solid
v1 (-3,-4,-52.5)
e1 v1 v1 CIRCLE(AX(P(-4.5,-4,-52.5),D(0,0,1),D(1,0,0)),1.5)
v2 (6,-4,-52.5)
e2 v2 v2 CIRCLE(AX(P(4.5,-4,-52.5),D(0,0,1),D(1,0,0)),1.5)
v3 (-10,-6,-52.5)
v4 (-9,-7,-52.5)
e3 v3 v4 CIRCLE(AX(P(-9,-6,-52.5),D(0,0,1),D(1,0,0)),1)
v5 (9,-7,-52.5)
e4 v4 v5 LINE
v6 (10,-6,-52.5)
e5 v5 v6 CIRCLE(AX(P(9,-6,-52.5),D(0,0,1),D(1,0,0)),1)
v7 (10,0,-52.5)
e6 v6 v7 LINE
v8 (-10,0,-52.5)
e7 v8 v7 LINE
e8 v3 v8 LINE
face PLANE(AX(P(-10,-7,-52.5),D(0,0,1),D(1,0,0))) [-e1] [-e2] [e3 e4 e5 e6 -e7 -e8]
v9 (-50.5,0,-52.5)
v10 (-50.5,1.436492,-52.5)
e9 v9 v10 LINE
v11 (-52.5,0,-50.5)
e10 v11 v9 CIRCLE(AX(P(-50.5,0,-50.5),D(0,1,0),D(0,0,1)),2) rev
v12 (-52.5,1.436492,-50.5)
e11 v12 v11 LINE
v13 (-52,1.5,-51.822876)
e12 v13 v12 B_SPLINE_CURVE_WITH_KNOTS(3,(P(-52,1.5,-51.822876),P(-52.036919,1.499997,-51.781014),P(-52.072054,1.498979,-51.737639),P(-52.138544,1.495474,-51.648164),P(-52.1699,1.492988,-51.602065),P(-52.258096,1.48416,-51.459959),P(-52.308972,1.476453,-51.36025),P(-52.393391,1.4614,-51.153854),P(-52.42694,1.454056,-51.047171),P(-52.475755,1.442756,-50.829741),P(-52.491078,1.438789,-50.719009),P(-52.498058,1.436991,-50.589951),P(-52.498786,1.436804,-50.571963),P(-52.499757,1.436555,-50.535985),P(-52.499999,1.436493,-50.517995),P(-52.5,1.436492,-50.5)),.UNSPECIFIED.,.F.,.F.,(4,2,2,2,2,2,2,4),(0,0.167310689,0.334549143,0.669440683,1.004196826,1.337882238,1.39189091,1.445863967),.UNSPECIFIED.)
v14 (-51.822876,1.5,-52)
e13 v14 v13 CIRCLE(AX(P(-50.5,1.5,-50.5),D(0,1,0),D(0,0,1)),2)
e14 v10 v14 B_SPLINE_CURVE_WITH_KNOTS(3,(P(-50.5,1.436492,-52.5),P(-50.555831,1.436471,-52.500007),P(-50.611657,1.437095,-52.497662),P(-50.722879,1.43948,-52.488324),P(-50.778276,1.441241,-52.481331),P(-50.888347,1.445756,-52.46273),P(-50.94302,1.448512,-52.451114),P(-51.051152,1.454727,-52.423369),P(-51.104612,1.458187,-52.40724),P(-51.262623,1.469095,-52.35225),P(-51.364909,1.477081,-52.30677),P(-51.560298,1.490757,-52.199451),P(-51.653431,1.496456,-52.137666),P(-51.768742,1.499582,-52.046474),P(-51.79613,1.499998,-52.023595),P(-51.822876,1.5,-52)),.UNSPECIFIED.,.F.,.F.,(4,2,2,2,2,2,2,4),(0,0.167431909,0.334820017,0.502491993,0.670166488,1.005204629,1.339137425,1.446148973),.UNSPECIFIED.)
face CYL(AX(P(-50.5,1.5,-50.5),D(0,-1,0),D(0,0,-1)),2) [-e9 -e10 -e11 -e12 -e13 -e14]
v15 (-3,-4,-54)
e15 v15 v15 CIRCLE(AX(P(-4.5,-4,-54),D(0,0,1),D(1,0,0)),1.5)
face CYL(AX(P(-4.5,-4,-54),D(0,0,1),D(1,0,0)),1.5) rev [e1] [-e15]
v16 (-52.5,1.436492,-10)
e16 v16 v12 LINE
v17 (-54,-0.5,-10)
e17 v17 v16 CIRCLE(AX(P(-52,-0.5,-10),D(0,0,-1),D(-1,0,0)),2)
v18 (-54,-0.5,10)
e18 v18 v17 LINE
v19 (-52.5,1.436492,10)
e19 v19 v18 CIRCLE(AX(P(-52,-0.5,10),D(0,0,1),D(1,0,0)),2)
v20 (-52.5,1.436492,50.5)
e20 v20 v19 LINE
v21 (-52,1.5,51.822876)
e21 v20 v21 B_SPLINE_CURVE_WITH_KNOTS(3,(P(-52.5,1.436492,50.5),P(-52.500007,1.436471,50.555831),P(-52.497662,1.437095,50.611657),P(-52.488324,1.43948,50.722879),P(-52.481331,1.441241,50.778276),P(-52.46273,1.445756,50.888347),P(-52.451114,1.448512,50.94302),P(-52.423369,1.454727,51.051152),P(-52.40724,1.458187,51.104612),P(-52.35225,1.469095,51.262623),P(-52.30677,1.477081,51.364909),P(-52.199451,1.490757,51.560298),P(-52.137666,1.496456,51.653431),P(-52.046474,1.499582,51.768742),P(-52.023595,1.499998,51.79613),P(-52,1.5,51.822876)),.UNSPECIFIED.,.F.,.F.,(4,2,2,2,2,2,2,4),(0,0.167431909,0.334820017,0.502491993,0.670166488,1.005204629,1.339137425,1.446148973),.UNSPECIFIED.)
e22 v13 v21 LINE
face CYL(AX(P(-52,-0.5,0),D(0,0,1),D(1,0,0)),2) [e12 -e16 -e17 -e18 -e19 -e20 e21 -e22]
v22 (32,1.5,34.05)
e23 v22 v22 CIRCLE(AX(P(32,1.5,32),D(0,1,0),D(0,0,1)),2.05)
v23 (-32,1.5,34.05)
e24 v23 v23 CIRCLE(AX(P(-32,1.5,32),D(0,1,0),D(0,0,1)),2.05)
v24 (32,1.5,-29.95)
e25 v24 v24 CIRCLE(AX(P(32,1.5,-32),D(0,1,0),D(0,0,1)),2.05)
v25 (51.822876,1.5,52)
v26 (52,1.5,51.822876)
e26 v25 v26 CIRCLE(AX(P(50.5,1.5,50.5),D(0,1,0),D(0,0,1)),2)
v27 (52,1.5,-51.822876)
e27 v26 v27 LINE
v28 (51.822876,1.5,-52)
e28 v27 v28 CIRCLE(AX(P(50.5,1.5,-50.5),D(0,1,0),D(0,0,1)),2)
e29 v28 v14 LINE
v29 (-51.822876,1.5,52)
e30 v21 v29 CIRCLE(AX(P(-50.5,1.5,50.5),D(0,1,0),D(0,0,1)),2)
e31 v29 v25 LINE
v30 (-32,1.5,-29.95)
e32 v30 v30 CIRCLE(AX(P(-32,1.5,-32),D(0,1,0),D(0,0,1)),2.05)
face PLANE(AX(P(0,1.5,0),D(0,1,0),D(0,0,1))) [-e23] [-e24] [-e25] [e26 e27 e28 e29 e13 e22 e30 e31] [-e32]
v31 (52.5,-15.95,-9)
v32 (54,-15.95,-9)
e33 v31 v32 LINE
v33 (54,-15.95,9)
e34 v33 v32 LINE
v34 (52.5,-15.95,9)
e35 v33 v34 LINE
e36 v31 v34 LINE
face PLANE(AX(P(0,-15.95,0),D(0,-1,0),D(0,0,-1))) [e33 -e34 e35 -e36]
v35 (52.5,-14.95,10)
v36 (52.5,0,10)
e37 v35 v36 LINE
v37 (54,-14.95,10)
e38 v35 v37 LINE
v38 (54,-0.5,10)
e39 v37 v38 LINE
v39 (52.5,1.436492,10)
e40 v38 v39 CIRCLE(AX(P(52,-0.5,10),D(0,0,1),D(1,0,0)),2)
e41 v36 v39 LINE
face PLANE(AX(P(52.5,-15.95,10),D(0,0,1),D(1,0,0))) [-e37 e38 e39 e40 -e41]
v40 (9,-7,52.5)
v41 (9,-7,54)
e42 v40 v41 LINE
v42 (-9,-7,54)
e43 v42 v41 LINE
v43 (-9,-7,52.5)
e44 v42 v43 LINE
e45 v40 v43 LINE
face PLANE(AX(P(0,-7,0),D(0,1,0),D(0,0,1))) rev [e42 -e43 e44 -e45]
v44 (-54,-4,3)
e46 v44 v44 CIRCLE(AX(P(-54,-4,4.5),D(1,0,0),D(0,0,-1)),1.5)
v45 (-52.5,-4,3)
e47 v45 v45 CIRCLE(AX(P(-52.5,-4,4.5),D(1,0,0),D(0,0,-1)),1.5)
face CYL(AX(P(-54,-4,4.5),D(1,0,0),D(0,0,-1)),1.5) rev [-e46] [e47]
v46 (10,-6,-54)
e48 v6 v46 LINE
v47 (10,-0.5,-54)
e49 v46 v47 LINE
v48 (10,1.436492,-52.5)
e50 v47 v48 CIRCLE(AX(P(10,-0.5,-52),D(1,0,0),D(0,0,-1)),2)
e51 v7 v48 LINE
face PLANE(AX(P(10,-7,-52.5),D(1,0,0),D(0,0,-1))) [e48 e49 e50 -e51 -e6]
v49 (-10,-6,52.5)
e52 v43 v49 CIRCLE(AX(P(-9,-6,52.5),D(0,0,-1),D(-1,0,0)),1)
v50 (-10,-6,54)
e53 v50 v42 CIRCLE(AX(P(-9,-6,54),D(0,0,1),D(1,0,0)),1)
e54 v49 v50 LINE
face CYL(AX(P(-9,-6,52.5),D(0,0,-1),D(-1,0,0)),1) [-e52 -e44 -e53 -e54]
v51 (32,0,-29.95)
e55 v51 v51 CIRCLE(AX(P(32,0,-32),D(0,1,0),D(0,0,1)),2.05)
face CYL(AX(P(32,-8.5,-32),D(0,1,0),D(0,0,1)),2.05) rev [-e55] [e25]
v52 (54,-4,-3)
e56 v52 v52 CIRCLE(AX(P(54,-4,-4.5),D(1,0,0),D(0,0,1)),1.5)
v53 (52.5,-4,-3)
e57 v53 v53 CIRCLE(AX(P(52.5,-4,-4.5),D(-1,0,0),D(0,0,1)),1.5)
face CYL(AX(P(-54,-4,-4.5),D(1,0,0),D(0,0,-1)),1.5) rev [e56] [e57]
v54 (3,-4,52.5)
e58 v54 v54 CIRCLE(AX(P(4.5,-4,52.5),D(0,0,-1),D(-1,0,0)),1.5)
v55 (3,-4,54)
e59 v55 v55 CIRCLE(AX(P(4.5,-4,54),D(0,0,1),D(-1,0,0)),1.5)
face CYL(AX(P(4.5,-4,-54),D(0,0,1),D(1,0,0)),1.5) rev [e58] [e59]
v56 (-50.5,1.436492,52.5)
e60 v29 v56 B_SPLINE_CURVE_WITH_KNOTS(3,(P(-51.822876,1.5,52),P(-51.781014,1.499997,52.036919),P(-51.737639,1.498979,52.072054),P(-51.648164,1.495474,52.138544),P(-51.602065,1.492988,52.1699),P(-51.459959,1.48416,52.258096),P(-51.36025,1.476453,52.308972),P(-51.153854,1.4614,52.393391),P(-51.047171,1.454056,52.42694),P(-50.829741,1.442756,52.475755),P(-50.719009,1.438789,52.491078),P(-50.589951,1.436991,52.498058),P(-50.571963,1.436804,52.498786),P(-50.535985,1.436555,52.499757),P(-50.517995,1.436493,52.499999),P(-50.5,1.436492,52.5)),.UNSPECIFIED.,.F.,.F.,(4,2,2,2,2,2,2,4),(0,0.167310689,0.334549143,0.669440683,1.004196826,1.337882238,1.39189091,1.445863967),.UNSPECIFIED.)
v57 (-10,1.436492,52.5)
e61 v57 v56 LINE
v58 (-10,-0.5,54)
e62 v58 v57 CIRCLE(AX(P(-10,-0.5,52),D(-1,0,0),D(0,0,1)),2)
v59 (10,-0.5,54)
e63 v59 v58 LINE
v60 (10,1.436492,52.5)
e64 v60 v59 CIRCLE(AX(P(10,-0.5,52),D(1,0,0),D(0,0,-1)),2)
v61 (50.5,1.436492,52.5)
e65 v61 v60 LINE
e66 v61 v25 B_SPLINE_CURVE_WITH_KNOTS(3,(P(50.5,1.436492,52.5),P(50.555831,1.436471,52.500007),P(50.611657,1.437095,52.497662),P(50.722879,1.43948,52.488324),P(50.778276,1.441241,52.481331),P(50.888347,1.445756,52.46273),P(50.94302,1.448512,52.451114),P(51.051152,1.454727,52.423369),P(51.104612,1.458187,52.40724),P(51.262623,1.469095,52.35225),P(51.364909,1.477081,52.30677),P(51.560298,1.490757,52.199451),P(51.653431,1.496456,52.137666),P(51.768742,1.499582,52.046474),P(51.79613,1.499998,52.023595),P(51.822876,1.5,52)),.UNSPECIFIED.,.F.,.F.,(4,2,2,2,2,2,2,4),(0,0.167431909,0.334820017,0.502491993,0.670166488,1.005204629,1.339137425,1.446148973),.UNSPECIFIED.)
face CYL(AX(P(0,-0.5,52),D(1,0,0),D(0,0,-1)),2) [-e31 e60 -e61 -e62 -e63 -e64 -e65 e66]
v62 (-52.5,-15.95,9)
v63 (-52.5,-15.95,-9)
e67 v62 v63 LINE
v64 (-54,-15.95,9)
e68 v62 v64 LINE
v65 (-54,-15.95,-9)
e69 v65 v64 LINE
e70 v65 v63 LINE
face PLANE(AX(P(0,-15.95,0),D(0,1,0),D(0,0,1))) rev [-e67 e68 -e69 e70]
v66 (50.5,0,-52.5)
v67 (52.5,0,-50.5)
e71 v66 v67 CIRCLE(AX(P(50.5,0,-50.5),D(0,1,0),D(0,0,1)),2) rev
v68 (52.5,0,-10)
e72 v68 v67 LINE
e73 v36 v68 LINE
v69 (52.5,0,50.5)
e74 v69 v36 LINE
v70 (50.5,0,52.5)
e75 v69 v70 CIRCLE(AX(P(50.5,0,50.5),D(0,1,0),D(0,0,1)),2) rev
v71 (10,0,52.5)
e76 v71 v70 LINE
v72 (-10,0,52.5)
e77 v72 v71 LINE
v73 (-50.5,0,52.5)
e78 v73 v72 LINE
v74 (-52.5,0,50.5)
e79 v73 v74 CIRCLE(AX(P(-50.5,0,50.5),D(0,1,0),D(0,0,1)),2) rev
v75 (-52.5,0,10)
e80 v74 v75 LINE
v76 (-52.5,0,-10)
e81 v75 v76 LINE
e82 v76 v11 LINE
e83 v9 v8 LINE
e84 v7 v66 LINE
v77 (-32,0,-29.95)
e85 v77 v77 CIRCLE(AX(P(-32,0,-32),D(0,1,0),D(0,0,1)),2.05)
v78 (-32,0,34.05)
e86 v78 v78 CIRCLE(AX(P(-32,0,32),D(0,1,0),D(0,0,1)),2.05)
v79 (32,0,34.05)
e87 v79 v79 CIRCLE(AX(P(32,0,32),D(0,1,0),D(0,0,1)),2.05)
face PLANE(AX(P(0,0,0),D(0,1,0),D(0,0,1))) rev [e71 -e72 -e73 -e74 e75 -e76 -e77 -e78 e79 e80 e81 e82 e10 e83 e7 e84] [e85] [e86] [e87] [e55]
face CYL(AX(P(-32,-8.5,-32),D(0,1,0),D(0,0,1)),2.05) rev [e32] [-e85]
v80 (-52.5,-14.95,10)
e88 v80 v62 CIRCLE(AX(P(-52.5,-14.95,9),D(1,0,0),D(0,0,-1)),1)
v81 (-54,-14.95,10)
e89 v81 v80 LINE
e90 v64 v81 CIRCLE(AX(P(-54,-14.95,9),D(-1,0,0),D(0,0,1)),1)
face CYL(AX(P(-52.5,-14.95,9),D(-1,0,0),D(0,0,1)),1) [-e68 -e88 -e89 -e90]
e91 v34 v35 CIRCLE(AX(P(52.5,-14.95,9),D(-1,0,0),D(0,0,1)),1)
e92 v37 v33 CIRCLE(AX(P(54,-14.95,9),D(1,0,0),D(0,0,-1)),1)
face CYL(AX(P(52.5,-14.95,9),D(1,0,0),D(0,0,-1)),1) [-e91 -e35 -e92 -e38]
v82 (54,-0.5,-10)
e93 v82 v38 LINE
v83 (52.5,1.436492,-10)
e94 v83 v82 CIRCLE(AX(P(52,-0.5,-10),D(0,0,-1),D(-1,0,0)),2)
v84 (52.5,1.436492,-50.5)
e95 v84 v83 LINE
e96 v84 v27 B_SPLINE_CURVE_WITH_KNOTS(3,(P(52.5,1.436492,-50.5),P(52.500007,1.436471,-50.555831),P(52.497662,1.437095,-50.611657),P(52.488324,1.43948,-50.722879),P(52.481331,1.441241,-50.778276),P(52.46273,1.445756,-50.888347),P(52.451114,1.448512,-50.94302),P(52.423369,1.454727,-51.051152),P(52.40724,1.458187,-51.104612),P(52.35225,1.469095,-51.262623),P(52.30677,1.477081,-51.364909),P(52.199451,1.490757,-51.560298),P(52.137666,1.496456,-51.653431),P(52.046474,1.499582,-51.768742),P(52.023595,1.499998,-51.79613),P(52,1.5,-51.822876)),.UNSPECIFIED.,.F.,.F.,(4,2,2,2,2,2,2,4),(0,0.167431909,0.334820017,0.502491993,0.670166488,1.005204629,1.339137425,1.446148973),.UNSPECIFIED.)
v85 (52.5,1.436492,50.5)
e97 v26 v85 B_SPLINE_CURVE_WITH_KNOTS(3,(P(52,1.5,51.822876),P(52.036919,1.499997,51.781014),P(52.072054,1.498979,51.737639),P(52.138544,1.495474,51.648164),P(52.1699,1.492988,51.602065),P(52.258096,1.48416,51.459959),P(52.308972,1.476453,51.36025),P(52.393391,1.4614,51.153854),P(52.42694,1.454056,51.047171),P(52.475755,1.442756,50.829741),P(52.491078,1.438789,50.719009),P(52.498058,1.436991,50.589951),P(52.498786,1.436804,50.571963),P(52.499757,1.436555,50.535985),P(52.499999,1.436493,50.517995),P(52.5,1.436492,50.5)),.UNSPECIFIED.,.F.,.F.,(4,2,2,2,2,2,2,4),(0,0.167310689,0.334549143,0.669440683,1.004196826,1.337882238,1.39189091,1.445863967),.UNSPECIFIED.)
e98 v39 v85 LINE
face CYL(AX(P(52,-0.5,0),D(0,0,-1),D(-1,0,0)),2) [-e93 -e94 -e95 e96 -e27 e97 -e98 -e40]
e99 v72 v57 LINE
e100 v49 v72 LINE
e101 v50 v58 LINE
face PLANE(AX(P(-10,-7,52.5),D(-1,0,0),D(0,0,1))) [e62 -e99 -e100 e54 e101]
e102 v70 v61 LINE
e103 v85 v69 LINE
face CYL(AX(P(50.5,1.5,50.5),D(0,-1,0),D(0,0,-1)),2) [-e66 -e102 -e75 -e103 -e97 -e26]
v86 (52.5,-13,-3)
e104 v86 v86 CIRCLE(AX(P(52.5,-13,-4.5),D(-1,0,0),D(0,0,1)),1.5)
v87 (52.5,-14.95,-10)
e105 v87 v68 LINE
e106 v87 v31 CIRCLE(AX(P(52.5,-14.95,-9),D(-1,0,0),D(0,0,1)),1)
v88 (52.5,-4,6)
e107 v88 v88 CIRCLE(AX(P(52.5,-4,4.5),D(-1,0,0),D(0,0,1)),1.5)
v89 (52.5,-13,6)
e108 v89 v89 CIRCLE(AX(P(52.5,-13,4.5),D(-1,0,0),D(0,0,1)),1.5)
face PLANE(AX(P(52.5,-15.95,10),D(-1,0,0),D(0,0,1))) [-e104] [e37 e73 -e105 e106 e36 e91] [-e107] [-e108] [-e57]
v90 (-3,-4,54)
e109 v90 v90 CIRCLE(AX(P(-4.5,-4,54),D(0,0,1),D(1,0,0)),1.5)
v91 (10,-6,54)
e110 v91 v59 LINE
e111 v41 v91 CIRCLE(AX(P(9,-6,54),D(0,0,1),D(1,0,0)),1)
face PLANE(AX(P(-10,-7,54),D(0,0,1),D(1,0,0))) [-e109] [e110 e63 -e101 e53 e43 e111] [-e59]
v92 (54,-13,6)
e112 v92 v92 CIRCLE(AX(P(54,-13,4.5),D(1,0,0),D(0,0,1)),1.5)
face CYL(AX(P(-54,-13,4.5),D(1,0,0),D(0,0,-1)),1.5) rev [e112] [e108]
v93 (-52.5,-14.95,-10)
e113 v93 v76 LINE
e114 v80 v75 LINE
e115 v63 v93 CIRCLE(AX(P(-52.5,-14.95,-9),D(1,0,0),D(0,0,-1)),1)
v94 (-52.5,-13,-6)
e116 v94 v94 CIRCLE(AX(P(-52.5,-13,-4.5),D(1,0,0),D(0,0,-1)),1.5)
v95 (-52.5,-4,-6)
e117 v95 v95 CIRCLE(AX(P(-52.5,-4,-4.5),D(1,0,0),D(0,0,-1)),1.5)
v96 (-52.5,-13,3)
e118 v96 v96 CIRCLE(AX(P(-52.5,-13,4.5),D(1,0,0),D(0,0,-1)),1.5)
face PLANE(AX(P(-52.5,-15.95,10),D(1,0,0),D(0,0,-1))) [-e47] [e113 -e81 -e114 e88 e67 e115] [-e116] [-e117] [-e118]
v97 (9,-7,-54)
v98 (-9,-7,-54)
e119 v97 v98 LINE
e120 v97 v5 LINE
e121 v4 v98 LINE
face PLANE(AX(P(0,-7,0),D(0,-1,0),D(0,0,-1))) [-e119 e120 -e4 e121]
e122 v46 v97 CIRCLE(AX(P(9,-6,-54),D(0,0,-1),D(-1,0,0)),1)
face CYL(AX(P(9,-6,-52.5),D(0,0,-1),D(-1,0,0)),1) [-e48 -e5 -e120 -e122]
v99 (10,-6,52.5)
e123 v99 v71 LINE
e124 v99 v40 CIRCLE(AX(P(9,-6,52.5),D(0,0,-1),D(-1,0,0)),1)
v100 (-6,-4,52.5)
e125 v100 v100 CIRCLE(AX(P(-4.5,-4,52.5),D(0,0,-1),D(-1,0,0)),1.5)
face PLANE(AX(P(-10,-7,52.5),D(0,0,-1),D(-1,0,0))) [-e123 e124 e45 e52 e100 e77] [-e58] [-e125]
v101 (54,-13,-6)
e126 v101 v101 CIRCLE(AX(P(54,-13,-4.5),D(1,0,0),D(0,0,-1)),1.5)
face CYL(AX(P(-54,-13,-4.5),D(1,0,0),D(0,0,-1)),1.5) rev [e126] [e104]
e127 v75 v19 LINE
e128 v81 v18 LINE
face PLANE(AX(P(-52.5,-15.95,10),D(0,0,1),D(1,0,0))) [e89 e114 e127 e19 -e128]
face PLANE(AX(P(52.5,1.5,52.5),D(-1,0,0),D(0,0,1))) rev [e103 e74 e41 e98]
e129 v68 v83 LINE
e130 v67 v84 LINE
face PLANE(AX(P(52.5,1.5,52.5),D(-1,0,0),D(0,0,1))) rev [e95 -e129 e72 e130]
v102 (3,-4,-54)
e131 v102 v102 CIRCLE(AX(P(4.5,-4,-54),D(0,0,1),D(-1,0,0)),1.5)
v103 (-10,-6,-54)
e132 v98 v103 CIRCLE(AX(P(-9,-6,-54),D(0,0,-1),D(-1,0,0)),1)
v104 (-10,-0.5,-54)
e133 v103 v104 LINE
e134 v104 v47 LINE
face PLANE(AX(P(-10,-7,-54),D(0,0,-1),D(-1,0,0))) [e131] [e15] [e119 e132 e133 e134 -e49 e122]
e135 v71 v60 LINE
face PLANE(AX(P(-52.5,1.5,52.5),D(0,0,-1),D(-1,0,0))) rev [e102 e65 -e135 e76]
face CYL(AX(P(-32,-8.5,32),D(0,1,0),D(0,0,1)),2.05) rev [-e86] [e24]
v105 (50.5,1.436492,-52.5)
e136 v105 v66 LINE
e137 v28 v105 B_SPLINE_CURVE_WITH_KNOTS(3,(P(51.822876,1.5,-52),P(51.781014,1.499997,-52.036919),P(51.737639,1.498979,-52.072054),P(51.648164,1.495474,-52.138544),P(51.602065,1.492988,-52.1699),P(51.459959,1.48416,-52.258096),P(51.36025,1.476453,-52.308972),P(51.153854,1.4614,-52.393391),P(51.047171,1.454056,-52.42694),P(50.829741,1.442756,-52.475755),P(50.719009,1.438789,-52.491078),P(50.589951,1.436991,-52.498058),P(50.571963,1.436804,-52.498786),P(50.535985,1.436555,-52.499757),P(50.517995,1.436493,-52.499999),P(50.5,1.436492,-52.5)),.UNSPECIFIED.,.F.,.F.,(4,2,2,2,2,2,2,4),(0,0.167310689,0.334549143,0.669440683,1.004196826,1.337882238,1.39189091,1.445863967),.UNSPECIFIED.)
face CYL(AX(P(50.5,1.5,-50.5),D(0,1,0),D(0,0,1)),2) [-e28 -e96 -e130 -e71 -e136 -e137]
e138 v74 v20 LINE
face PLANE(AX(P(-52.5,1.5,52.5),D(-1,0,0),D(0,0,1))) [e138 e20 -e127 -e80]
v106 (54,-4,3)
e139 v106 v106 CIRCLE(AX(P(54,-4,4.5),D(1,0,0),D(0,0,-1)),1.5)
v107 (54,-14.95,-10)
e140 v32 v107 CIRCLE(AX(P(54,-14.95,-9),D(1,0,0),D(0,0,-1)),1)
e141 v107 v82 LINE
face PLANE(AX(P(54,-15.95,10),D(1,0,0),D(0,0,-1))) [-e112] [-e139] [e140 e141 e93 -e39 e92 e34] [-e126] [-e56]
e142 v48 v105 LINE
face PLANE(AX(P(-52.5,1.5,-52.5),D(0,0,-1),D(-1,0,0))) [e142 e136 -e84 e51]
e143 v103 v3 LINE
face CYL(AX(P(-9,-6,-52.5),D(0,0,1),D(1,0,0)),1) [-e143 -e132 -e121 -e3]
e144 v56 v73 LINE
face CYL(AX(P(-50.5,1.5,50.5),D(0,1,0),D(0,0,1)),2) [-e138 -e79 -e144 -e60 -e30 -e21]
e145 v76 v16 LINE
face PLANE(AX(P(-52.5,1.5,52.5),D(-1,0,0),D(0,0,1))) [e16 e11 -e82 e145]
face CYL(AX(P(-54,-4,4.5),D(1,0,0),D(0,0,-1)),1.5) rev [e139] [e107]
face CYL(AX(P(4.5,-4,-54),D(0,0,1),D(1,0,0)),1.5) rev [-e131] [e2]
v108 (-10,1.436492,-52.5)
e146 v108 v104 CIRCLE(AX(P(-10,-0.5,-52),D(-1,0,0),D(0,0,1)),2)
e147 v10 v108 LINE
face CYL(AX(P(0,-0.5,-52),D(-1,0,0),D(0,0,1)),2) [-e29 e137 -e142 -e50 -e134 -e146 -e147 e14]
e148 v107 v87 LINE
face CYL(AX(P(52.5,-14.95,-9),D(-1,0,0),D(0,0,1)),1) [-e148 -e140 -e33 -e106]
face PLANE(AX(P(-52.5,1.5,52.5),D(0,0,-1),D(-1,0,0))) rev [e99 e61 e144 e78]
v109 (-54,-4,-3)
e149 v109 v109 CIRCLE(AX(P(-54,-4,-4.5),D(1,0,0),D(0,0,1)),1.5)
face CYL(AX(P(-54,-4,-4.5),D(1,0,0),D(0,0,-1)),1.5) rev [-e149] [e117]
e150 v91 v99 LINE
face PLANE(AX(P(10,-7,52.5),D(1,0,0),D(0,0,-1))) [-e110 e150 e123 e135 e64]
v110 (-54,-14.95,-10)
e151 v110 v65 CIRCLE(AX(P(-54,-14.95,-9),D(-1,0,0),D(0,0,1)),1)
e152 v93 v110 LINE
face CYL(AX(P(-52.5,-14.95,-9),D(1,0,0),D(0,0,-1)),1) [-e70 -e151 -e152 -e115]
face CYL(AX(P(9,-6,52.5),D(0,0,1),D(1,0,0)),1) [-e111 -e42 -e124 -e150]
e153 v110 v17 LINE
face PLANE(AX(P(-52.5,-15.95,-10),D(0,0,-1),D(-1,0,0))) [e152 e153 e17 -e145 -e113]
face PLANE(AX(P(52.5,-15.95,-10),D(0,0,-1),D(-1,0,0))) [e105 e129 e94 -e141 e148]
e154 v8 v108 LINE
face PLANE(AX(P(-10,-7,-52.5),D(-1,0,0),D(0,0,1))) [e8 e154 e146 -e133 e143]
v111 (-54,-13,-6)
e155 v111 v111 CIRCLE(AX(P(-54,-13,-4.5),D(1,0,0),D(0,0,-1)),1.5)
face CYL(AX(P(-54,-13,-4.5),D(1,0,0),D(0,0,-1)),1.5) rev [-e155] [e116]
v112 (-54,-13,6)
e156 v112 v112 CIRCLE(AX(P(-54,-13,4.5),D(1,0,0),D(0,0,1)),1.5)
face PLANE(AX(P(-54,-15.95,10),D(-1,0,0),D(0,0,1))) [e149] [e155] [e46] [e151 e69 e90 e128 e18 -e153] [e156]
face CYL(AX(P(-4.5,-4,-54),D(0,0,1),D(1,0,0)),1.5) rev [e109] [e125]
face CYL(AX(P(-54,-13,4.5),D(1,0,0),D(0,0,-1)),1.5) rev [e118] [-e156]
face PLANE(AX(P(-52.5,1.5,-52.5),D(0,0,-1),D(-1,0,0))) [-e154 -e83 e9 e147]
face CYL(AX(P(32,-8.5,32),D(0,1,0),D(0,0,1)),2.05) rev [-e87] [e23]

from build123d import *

# Parameters (mm, degrees)
SKETCH1_W                     = 105
SKETCH1_H                     = 105
BOSS_EXTRUDE1_DEPTH           = 1.5
SKETCH2_W                     = 20
SKETCH2_H                     = 1.5
BOSS_EXTRUDE2_DEPTH           = 8.5
SKETCH3_W                     = 1.5
SKETCH3_H                     = 20
BOSS_EXTRUDE3_DEPTH           = 17.45
SKETCH4_R                     = 1.5
CUT_EXTRUDE1_DEPTH            = 122.796561938
SKETCH5_R                     = 1.5
CUT_EXTRUDE2_DEPTH            = 122.796561938
FILLET1_R                     = 1
FILLET2_START                 = -53.84589
FILLET2_DEPTH                 = 107.69178
FILLET2_START_2               = -53
FILLET2_2_DEPTH               = 106
FILLET3_R                     = 2
SKETCH6_R                     = 2.05
HOLES_FOR_BULKHEAD_RODS_DEPTH = 10


with BuildPart() as part:
    # Sketch1 → Boss-Extrude1 (new body)
    with BuildSketch(Plane(origin=(0, 0, 0), x_dir=(1, 0, 0), z_dir=(0, 1, 0))):
        Rectangle(SKETCH1_W, SKETCH1_H)
    extrude(amount=BOSS_EXTRUDE1_DEPTH)

    # Sketch2 → Boss-Extrude2 (add)
    with BuildSketch(Plane(origin=(0, 1.5, 0), x_dir=(1, 0, 0), z_dir=(0, 1, 0))):
        with Locations((0, 53.25)):
            Rectangle(SKETCH2_W, SKETCH2_H)
        with Locations((0, -53.25)):
            Rectangle(SKETCH2_W, SKETCH2_H)
    extrude(amount=-BOSS_EXTRUDE2_DEPTH)

    # Sketch3 → Boss-Extrude3 (add)
    with BuildSketch(Plane(origin=(0, 1.5, 0), x_dir=(1, 0, 0), z_dir=(0, 1, 0))):
        with Locations((53.25, 0)):
            Rectangle(SKETCH3_W, SKETCH3_H)
        with Locations((-53.25, 0)):
            Rectangle(SKETCH3_W, SKETCH3_H)
    extrude(amount=-BOSS_EXTRUDE3_DEPTH)

    # Sketch4 → Cut-Extrude1 (cut, through all)
    with BuildSketch(Plane.XY.offset(54)):
        with Locations((-4.5, -4)):
            Circle(SKETCH4_R)
        with Locations(Location((4.5, -4, 0), (0, 0, 180))):
            Circle(SKETCH4_R)
    extrude(amount=-CUT_EXTRUDE1_DEPTH, mode=Mode.SUBTRACT)

    # Sketch5 → Cut-Extrude2 (cut, through all)
    with BuildSketch(Plane(origin=(54, 0, 0), x_dir=(0, 0, -1), z_dir=(1, 0, 0))):
        with Locations((-4.5, -4)):
            Circle(SKETCH5_R)
        with Locations((4.5, -4)):
            Circle(SKETCH5_R)
        with Locations((4.5, -13)):
            Circle(SKETCH5_R)
        with Locations((-4.5, -13)):
            Circle(SKETCH5_R)
    extrude(amount=-CUT_EXTRUDE2_DEPTH, mode=Mode.SUBTRACT)

    # Fillet1
    fillet1_edges = [part.edges().sort_by_distance(p)[0] for p in [
        (-10, -7, -53.25),
        (10, -7, -53.25),
        (-10, -7, 53.25),
        (10, -7, 53.25),
        (53.25, -15.95, -10),
        (53.25, -15.95, 10),
        (-53.25, -15.95, 10),
        (-53.25, -15.95, -10),
    ]]
    fillet(fillet1_edges, radius=FILLET1_R)

    # Fillet2: read off the stored shape, not the designer's step
    # Fillet2 outline → Fillet2 (cut)
    with BuildSketch(Plane.XY.offset(FILLET2_START)):
        with BuildLine():
            ThreePointArc((52, 1.5), (53.414213562, 0.914213562), (54, -0.5))
            Line((54, -0.5), (54, 1.5))
            Line((54, 1.5), (52, 1.5))
        make_face()
        with BuildLine():
            Line((-52, 1.5), (-54, 1.5))
            Line((-54, 1.5), (-54, -0.5))
            ThreePointArc((-54, -0.5), (-53.414213562, 0.914213562), (-52, 1.5))
        make_face()
    extrude(amount=FILLET2_DEPTH, mode=Mode.SUBTRACT)

    # Fillet2 2 outline → Fillet2 2 (cut)
    with BuildSketch(Plane.YZ.offset(FILLET2_START_2)):
        with BuildLine():
            ThreePointArc((1.5, -52), (0.914213562, -53.414213562), (-0.5, -54))
            Line((-0.5, -54), (1.5, -54))
            Line((1.5, -54), (1.5, -52))
        make_face()
        with BuildLine():
            Line((1.5, 52), (1.5, 54))
            Line((1.5, 54), (-0.5, 54))
            ThreePointArc((-0.5, 54), (0.914213562, 53.414213562), (1.5, 52))
        make_face()
    extrude(amount=FILLET2_2_DEPTH, mode=Mode.SUBTRACT)

    # Fillet3
    # the kernel refuses this fillet: 2 mm, written as the material it takes off along each edge
    with BuildSketch(Plane(origin=(52.5, -5, -52.5), x_dir=(0, 0, 1), z_dir=(0, 1, 0)), Plane(origin=(52.5, -5, 52.5), x_dir=(-1, 0, 0), z_dir=(0, 1, 0)), Plane(origin=(-52.5, -5, -52.5), x_dir=(1, 0, 0), z_dir=(0, 1, 0))) as fillet3_piece_1:
        with BuildLine():
            CenterArc((FILLET3_R, -FILLET3_R), FILLET3_R, 90, 90)
            Line((0, -FILLET3_R), (0, 0))
            Line((0, 0), (FILLET3_R, 0))
        make_face()
    extrude(amount=11.436491673, mode=Mode.SUBTRACT)
    with BuildSketch(Plane(origin=(-52.5, -5, 52.5), x_dir=(1, 0, 0), z_dir=(0, 1, 0))) as fillet3_piece_2:
        with BuildLine():
            CenterArc((FILLET3_R, FILLET3_R), FILLET3_R, 180, 90)
            Line((0, FILLET3_R), (0, 0))
            Line((0, 0), (FILLET3_R, 0))
        make_face()
    extrude(amount=11.436491673, mode=Mode.SUBTRACT)

    # Sketch6 → Holes for Bulkhead Rods (cut)
    with BuildSketch(Plane(origin=(0, 1.5, 0), x_dir=(1, 0, 0), z_dir=(0, 1, 0))):
        with Locations(Location((-32, 32, 0), (0, 0, 270))):
            Circle(SKETCH6_R)
        with Locations(Location((32, 32, 0), (0, 0, 270))):
            Circle(SKETCH6_R)
        with Locations(Location((-32, -32, 0), (0, 0, 270))):
            Circle(SKETCH6_R)
        with Locations(Location((32, -32, 0), (0, 0, 270))):
            Circle(SKETCH6_R)
    extrude(amount=-HOLES_FOR_BULKHEAD_RODS_DEPTH, mode=Mode.SUBTRACT)


solid = part.part
